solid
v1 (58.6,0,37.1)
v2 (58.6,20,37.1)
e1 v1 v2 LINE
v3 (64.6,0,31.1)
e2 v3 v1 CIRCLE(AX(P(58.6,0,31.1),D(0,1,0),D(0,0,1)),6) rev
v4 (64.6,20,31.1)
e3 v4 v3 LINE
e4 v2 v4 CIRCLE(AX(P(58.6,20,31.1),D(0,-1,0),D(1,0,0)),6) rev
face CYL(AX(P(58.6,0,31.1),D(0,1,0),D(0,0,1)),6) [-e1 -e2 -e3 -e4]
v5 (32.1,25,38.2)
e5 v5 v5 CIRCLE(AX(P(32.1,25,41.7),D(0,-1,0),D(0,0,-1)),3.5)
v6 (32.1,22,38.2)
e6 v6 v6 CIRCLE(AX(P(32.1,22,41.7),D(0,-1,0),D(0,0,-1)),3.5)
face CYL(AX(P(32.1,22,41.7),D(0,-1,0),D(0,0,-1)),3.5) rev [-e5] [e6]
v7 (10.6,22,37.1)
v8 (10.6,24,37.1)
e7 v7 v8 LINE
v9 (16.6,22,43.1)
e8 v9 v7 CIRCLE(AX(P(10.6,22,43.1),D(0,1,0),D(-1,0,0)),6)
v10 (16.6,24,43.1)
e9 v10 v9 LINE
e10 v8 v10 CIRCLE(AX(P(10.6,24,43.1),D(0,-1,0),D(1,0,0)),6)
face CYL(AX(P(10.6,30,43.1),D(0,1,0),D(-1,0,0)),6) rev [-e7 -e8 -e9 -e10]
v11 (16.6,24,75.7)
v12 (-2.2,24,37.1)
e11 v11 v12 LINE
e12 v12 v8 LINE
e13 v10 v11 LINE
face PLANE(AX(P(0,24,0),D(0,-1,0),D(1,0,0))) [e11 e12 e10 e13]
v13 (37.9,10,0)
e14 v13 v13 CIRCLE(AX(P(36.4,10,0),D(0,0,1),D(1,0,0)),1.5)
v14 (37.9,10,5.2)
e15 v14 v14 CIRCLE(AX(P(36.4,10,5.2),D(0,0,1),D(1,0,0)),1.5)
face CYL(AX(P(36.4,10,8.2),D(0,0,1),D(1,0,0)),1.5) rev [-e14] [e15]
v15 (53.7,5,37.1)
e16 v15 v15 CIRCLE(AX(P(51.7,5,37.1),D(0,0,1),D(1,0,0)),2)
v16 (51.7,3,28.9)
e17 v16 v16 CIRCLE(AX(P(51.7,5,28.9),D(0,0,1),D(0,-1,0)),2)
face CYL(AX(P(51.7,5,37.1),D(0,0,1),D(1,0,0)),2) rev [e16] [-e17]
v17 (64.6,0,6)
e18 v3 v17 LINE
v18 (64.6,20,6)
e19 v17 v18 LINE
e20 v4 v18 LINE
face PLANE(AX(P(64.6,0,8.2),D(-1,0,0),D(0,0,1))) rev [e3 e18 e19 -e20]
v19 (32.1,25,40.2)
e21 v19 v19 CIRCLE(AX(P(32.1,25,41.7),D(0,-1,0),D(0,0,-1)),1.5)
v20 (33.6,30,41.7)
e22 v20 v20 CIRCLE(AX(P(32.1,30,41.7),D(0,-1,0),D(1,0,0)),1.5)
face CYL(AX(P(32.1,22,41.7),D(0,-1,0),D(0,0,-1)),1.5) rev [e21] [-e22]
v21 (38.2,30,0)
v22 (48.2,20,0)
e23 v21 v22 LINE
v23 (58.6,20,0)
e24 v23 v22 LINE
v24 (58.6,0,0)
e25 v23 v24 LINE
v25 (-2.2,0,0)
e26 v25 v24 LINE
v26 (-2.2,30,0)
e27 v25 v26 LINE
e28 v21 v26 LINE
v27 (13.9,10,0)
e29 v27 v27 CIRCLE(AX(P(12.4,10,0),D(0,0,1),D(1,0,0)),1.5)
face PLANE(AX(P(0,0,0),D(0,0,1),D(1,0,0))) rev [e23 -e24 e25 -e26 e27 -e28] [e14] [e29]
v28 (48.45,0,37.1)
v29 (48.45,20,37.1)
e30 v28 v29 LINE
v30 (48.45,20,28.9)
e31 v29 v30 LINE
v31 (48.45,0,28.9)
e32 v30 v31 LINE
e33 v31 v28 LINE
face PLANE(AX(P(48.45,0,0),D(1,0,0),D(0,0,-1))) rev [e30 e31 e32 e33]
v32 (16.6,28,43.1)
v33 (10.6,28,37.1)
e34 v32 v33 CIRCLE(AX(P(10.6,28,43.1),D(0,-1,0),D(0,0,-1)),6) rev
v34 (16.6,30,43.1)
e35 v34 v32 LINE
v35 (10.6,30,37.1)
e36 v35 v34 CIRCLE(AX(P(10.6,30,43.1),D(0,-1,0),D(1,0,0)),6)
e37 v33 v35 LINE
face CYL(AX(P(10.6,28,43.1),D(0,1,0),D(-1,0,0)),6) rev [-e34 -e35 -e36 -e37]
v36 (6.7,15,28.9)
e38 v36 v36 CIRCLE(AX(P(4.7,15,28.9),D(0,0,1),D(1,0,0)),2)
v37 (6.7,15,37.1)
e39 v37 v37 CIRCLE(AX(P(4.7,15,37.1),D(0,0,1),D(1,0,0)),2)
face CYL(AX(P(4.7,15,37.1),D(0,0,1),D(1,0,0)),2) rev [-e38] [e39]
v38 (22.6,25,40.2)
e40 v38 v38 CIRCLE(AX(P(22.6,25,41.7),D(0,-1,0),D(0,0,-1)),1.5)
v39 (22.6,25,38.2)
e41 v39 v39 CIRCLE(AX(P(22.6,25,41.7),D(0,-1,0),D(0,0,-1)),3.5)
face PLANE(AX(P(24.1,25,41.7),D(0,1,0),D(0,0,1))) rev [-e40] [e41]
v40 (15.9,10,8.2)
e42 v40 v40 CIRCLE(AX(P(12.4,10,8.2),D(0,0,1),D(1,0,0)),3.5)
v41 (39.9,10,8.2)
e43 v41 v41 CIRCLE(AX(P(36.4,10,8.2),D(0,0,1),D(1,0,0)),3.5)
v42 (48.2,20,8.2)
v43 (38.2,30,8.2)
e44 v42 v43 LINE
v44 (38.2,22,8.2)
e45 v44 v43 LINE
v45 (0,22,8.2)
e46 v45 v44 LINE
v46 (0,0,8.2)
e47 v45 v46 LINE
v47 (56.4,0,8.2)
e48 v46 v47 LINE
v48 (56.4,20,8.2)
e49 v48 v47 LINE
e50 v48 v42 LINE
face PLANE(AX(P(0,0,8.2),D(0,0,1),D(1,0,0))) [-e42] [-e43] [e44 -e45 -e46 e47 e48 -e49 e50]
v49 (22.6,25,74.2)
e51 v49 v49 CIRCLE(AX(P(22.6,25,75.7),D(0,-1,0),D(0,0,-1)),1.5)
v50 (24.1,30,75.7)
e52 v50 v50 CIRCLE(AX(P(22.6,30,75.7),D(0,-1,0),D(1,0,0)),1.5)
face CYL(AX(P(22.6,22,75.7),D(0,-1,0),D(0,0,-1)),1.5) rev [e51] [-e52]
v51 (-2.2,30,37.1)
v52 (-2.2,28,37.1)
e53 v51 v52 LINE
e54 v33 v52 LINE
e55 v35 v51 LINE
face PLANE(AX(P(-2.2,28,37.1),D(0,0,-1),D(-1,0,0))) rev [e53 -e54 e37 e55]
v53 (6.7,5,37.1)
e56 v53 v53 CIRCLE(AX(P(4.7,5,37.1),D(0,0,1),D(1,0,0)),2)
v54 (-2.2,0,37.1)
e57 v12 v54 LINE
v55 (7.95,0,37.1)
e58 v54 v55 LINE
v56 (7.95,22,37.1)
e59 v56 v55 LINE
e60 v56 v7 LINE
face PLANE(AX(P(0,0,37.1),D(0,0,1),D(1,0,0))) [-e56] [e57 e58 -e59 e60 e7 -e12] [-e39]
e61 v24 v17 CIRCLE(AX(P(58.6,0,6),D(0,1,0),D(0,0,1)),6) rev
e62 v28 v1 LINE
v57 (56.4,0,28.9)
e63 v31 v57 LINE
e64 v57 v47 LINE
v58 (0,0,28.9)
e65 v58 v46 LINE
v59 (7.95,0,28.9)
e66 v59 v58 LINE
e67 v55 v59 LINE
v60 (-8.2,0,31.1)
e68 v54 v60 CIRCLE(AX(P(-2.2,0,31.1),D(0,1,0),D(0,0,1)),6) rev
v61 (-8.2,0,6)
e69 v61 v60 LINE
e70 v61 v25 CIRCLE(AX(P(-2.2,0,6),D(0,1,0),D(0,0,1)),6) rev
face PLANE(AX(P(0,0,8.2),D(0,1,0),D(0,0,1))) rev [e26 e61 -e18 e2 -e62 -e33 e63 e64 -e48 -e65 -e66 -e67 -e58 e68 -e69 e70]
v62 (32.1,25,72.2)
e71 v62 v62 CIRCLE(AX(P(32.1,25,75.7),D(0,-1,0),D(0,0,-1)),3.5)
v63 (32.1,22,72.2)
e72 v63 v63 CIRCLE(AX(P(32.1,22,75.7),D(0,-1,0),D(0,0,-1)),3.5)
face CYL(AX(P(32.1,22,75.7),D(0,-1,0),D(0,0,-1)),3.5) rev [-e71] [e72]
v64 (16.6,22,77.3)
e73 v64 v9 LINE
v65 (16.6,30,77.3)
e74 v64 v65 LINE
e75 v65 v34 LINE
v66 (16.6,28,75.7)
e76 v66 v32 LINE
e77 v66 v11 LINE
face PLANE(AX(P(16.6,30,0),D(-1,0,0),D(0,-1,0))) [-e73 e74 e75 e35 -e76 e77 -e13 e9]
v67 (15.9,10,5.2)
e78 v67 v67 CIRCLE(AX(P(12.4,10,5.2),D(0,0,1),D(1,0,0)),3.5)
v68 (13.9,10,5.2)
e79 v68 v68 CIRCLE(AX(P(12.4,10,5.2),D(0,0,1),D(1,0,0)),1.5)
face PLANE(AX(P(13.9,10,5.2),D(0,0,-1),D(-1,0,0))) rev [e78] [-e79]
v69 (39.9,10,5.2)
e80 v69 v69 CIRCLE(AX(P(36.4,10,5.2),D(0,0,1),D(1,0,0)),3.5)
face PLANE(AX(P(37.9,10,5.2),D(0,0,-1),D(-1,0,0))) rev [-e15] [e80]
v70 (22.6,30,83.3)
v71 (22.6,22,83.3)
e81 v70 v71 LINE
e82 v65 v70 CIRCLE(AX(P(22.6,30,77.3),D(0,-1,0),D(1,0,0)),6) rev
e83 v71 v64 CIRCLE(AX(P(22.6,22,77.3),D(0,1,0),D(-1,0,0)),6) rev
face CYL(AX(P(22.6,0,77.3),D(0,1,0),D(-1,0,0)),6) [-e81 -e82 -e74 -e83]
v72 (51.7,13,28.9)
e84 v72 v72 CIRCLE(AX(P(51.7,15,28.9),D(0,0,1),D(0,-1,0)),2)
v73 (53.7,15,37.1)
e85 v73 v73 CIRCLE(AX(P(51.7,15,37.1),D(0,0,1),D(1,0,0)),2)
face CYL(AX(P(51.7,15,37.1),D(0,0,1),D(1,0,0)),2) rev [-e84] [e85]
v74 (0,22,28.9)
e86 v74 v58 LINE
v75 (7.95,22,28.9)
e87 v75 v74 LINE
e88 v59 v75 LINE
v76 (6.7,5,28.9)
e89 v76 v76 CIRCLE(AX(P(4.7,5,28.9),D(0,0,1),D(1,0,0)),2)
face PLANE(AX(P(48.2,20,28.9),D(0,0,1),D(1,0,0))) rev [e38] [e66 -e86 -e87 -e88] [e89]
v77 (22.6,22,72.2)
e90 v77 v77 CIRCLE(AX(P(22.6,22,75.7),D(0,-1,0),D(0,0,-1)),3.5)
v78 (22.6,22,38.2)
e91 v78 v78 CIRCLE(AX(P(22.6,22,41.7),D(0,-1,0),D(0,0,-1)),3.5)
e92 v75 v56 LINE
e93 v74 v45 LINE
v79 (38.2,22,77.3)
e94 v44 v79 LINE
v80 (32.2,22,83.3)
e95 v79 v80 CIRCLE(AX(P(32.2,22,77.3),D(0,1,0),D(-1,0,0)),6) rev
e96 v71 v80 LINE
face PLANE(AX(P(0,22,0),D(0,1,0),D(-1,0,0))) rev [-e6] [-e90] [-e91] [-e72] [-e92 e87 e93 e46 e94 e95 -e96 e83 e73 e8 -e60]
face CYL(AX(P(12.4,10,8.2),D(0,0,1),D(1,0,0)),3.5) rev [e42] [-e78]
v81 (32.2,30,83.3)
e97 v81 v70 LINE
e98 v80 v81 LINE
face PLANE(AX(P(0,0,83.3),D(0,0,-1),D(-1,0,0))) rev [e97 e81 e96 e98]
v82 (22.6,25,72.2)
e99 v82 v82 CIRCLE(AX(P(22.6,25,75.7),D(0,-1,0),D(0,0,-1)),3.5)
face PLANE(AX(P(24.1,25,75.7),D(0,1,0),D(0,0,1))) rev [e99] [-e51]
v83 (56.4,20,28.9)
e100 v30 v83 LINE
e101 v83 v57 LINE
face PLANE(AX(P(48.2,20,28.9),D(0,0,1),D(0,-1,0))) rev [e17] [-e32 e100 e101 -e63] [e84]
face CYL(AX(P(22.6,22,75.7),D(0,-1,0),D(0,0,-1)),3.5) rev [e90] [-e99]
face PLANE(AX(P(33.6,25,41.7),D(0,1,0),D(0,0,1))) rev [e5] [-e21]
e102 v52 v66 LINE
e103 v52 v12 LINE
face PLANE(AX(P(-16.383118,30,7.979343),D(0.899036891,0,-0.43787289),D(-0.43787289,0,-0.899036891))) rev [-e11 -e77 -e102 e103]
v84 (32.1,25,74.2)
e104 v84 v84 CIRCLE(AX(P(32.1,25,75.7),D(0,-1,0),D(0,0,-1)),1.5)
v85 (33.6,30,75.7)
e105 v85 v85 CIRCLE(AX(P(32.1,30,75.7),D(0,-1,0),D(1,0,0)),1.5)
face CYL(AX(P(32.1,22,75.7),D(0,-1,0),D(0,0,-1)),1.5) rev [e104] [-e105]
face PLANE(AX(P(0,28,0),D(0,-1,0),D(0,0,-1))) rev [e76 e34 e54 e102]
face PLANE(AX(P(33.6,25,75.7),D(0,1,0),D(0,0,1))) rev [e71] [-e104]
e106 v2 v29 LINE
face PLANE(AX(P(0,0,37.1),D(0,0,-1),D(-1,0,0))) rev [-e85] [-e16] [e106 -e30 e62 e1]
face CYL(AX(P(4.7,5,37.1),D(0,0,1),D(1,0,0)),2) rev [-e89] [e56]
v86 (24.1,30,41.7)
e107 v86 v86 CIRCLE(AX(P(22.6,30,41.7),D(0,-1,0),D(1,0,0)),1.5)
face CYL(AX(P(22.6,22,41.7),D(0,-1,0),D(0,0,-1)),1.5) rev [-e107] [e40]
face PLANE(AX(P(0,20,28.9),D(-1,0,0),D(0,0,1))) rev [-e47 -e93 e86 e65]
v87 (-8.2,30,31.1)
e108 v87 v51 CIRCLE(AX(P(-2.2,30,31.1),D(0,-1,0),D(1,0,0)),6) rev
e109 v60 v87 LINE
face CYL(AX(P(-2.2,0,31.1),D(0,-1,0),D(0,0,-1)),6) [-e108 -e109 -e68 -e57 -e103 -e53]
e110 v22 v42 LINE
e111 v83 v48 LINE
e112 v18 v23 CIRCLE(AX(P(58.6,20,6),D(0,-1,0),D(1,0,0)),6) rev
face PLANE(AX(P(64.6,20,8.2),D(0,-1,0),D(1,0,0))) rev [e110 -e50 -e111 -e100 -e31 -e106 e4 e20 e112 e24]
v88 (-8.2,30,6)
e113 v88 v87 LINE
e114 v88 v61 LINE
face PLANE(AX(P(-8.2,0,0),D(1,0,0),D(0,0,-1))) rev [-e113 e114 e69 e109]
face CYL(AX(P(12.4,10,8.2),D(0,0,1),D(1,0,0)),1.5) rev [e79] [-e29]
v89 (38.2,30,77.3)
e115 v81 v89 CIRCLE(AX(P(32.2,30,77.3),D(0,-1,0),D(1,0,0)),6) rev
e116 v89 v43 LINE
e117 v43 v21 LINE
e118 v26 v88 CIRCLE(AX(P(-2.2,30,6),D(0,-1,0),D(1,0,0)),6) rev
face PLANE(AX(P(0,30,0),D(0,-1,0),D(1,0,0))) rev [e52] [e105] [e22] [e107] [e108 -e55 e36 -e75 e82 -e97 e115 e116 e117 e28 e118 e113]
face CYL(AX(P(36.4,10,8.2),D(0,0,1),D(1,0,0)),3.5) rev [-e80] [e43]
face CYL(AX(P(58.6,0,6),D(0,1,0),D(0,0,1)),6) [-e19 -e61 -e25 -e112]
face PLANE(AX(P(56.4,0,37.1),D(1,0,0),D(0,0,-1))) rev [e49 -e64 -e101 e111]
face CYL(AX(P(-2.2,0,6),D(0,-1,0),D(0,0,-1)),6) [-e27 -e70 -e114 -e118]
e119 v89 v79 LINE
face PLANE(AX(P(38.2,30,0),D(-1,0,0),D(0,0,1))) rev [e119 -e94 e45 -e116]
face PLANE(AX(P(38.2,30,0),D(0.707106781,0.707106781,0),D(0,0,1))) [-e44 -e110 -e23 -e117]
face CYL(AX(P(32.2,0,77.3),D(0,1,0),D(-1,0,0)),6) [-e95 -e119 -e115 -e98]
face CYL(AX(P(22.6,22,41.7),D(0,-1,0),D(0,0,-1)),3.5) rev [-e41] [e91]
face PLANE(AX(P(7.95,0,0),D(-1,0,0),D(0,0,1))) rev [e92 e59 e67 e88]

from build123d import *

# Parameters (mm, degrees)
SCHIZZO1_W                                   = 64.6
SCHIZZO1_H                                   = 20
ESTRUSIONE_ESTRUSIONE1_DEPTH                 = 8.2
SCHIZZO2_W                                   = 8.2
SCHIZZO2_H                                   = 20
ESTRUSIONE_ESTRUSIONE2_DEPTH                 = 28.9
SCHIZZO3_W                                   = 8.2
SCHIZZO3_H                                   = 20
ESTRUSIONE_ESTRUSIONE3_DEPTH                 = 28.9
SCHIZZO4_W                                   = 8.2
SCHIZZO4_H                                   = 20
ESTRUSIONE_ESTRUSIONE4_DEPTH                 = 8.2
SCHIZZO5_W                                   = 37.1
SCHIZZO5_H                                   = 20
ESTRUSIONE_ESTRUSIONE5_DEPTH                 = 8.2
SCHIZZO6_W                                   = 48.2
SCHIZZO6_H                                   = 20.7
TAGLIO_ESTRUSIONE1_DEPTH                     = 78.133455776
F_4_0_4_DIAMETER_HOLE2_D                     = 4
F_4_0_4_DIAMETER_HOLE2_DEPTH                 = 8.2
RACCORDO3_R                                  = 6
CBORE_FOR_M3_HEX_HEAD_CAP_SCREW1_D           = 3
CBORE_FOR_M3_HEX_HEAD_CAP_SCREW1_CBORE_D     = 7
CBORE_FOR_M3_HEX_HEAD_CAP_SCREW1_CBORE_DEPTH = 3
SKETCH5_W                                    = 46.4
SKETCH5_H                                    = 37.1
BOSS_EXTRUDE1_DEPTH                          = 10
FILLET3_R                                    = 6
CHAMFER2_SIZE                                = 10
CUT_EXTRUDE2_DEPTH                           = 2
SKETCH9_W                                    = 40.4
SKETCH9_H                                    = 8
BOSS_EXTRUDE2_DEPTH                          = 46.2
CBORE_FOR_M3_HEX_HEAD_CAP_SCREW2_D           = 3
CBORE_FOR_M3_HEX_HEAD_CAP_SCREW2_CBORE_D     = 7
CBORE_FOR_M3_HEX_HEAD_CAP_SCREW2_CBORE_DEPTH = 3
CUT_EXTRUDE3_DEPTH                           = 108.684957167
FILLET4_R                                    = 6
SKETCH15_W                                   = 8.2
SKETCH15_H                                   = 20
CUT_EXTRUDE4_DEPTH                           = 0.25
SKETCH16_W                                   = 8.2
SKETCH16_H                                   = 22
CUT_EXTRUDE5_DEPTH                           = 0.25
CUT_EXTRUDE6_DEPTH                           = 2
CUT_EXTRUDE7_DEPTH                           = 2
FILLET5_R                                    = 6
FILLET6_R                                    = 6


with BuildPart() as part:
    # Schizzo1 → Estrusione-Estrusione1 (new body)
    with BuildSketch(Plane.XY):
        with Locations((32.3, 10)):
            Rectangle(SCHIZZO1_W, SCHIZZO1_H)
    extrude(amount=ESTRUSIONE_ESTRUSIONE1_DEPTH)

    # Schizzo2 → Estrusione-Estrusione2 (add)
    with BuildSketch(Plane.XY.offset(8.2)):
        with Locations((4.1, 10)):
            Rectangle(SCHIZZO2_W, SCHIZZO2_H)
    extrude(amount=ESTRUSIONE_ESTRUSIONE2_DEPTH)

    # Schizzo3 → Estrusione-Estrusione3 (add)
    with BuildSketch(Plane.XY.offset(8.2)):
        with Locations((60.5, 10)):
            Rectangle(SCHIZZO3_W, SCHIZZO3_H)
    extrude(amount=ESTRUSIONE_ESTRUSIONE3_DEPTH)

    # Schizzo4 → Estrusione-Estrusione4 (add)
    with BuildSketch(Plane.ZY.offset(-56.4)):
        with Locations((33, 10)):
            Rectangle(SCHIZZO4_W, SCHIZZO4_H)
    extrude(amount=ESTRUSIONE_ESTRUSIONE4_DEPTH)

    # Schizzo5 → Estrusione-Estrusione5 (add)
    with BuildSketch(Plane.ZY):
        with Locations((18.55, 10)):
            Rectangle(SCHIZZO5_W, SCHIZZO5_H)
    extrude(amount=ESTRUSIONE_ESTRUSIONE5_DEPTH)

    # Schizzo6 → Taglio-Estrusione1 (cut, through all)
    with BuildSketch(Plane.XZ):
        with Locations((24.1, 18.55)):
            Rectangle(SCHIZZO6_W, SCHIZZO6_H)
    extrude(amount=-TAGLIO_ESTRUSIONE1_DEPTH, mode=Mode.SUBTRACT)

    # Ø4.0 (4) Diameter Hole2
    with Locations(Plane.XY.offset(37.1)):
        with Locations((51.7, 5), (4.7, 5), (4.7, 15), (51.7, 15)):
            Hole(F_4_0_4_DIAMETER_HOLE2_D / 2, depth=F_4_0_4_DIAMETER_HOLE2_DEPTH)

    # Raccordo3
    raccordo3_edges = [part.edges().sort_by_distance(p)[0] for p in [
        (64.6, 10, 37.1),
        (64.6, 10, 0),
    ]]
    fillet(raccordo3_edges, radius=RACCORDO3_R)

    # CBORE for M3 Hex Head Cap Screw1 (through all)
    with Locations(Plane.XY.offset(8.2)):
        with Locations((36.4, 10), (12.4, 10)):
            CounterBoreHole(CBORE_FOR_M3_HEX_HEAD_CAP_SCREW1_D / 2, CBORE_FOR_M3_HEX_HEAD_CAP_SCREW1_CBORE_D / 2, CBORE_FOR_M3_HEX_HEAD_CAP_SCREW1_CBORE_DEPTH)

    # Sketch5 → Boss-Extrude1 (add)
    with BuildSketch(Plane(origin=(0, 20, 0), x_dir=(1, 0, 0), z_dir=(0, 1, 0))):
        with Locations((15, -18.55)):
            Rectangle(SKETCH5_W, SKETCH5_H)
    extrude(amount=BOSS_EXTRUDE1_DEPTH)

    # Fillet3
    fillet3_edges = [part.edges().sort_by_distance(p)[0] for p in [
        (-8.2, 15, 37.1),
        (-8.2, 15, 0),
    ]]
    fillet(fillet3_edges, radius=FILLET3_R)

    # Chamfer2
    chamfer2_edges = [part.edges().sort_by_distance(p)[0] for p in [
        (38.2, 20, 4.1),
    ]]
    chamfer(chamfer2_edges, length=CHAMFER2_SIZE - 0.0001)  # a hair under: the kernel refuses the full size

    # Sketch8 → Cut-Extrude2 (cut)
    with BuildSketch(Plane(origin=(0, 20, 0), x_dir=(-1, 0, 0), z_dir=(0, -1, 0))):
        Polygon((-38.2, -37.1), (-38.2, -8.2), (0, -8.2), (0, -28.9), (-8.2, -28.9), (-8.2, -37.1), align=None)
    extrude(amount=-CUT_EXTRUDE2_DEPTH, mode=Mode.SUBTRACT)

    # Sketch9 → Boss-Extrude2 (add)
    with BuildSketch(Plane.XY.offset(37.1)):
        with Locations((18, 26)):
            Rectangle(SKETCH9_W, SKETCH9_H)
    extrude(amount=BOSS_EXTRUDE2_DEPTH)

    # CBORE for M3 Hex Head Cap Screw2 (through all)
    with Locations(Plane(origin=(0, 22, 0), x_dir=(-1, 0, 0), z_dir=(0, -1, 0))):
        with Locations((-22.6, -41.7), (-32.1, -41.7), (-22.6, -75.7), (-32.1, -75.7)):
            CounterBoreHole(CBORE_FOR_M3_HEX_HEAD_CAP_SCREW2_D / 2, CBORE_FOR_M3_HEX_HEAD_CAP_SCREW2_CBORE_D / 2, CBORE_FOR_M3_HEX_HEAD_CAP_SCREW2_CBORE_DEPTH)

    # Sketch13 → Cut-Extrude3 (cut, through all)
    with BuildSketch(Plane(origin=(0, 22, 0), x_dir=(-1, 0, 0), z_dir=(0, -1, 0))):
        Polygon((-16.6, -75.7), (-16.6, -83.3), (2.2, -83.3), (2.2, -37.1), align=None)
    extrude(amount=-CUT_EXTRUDE3_DEPTH, mode=Mode.SUBTRACT)

    # Fillet4
    fillet4_edges = [part.edges().sort_by_distance(p)[0] for p in [
        (38.2, 26, 83.3),
    ]]
    fillet(fillet4_edges, radius=FILLET4_R)

    # Sketch15 → Cut-Extrude4 (cut)
    with BuildSketch(Plane.ZY.offset(-48.2)):
        with Locations((33, 10)):
            Rectangle(SKETCH15_W, SKETCH15_H)
    extrude(amount=-CUT_EXTRUDE4_DEPTH, mode=Mode.SUBTRACT)

    # Sketch16 → Cut-Extrude5 (cut)
    with BuildSketch(Plane(origin=(8.2, 0, 0), x_dir=(0, 0, -1), z_dir=(1, 0, 0))):
        with Locations((-33, 11)):
            Rectangle(SKETCH16_W, SKETCH16_H)
    extrude(amount=-CUT_EXTRUDE5_DEPTH, mode=Mode.SUBTRACT)

    # Sketch21 → Cut-Extrude6 (cut)
    with BuildSketch(Plane(origin=(0, 30, 0), x_dir=(1, 0, 0), z_dir=(0, 1, 0))):
        Polygon((-2.2, -37.1), (16.6, -37.1), (16.6, -75.7), align=None)
    extrude(amount=-CUT_EXTRUDE6_DEPTH, mode=Mode.SUBTRACT)

    # Sketch22 → Cut-Extrude7 (cut)
    with BuildSketch(Plane(origin=(0, 22, 0), x_dir=(-1, 0, 0), z_dir=(0, -1, 0))):
        Polygon((2.2, -37.1), (-16.6, -37.1), (-16.6, -75.7), align=None)
    extrude(amount=-CUT_EXTRUDE7_DEPTH, mode=Mode.SUBTRACT)

    # Fillet5
    fillet5_edges = [part.edges().sort_by_distance(p)[0] for p in [
        (16.6, 26, 83.3),
    ]]
    fillet(fillet5_edges, radius=FILLET5_R)

    # Fillet6
    fillet6_edges = [part.edges().sort_by_distance(p)[0] for p in [
        (16.6, 29, 37.1),
        (16.6, 23, 37.1),
    ]]
    fillet(fillet6_edges, radius=FILLET6_R)


solid = part.part
